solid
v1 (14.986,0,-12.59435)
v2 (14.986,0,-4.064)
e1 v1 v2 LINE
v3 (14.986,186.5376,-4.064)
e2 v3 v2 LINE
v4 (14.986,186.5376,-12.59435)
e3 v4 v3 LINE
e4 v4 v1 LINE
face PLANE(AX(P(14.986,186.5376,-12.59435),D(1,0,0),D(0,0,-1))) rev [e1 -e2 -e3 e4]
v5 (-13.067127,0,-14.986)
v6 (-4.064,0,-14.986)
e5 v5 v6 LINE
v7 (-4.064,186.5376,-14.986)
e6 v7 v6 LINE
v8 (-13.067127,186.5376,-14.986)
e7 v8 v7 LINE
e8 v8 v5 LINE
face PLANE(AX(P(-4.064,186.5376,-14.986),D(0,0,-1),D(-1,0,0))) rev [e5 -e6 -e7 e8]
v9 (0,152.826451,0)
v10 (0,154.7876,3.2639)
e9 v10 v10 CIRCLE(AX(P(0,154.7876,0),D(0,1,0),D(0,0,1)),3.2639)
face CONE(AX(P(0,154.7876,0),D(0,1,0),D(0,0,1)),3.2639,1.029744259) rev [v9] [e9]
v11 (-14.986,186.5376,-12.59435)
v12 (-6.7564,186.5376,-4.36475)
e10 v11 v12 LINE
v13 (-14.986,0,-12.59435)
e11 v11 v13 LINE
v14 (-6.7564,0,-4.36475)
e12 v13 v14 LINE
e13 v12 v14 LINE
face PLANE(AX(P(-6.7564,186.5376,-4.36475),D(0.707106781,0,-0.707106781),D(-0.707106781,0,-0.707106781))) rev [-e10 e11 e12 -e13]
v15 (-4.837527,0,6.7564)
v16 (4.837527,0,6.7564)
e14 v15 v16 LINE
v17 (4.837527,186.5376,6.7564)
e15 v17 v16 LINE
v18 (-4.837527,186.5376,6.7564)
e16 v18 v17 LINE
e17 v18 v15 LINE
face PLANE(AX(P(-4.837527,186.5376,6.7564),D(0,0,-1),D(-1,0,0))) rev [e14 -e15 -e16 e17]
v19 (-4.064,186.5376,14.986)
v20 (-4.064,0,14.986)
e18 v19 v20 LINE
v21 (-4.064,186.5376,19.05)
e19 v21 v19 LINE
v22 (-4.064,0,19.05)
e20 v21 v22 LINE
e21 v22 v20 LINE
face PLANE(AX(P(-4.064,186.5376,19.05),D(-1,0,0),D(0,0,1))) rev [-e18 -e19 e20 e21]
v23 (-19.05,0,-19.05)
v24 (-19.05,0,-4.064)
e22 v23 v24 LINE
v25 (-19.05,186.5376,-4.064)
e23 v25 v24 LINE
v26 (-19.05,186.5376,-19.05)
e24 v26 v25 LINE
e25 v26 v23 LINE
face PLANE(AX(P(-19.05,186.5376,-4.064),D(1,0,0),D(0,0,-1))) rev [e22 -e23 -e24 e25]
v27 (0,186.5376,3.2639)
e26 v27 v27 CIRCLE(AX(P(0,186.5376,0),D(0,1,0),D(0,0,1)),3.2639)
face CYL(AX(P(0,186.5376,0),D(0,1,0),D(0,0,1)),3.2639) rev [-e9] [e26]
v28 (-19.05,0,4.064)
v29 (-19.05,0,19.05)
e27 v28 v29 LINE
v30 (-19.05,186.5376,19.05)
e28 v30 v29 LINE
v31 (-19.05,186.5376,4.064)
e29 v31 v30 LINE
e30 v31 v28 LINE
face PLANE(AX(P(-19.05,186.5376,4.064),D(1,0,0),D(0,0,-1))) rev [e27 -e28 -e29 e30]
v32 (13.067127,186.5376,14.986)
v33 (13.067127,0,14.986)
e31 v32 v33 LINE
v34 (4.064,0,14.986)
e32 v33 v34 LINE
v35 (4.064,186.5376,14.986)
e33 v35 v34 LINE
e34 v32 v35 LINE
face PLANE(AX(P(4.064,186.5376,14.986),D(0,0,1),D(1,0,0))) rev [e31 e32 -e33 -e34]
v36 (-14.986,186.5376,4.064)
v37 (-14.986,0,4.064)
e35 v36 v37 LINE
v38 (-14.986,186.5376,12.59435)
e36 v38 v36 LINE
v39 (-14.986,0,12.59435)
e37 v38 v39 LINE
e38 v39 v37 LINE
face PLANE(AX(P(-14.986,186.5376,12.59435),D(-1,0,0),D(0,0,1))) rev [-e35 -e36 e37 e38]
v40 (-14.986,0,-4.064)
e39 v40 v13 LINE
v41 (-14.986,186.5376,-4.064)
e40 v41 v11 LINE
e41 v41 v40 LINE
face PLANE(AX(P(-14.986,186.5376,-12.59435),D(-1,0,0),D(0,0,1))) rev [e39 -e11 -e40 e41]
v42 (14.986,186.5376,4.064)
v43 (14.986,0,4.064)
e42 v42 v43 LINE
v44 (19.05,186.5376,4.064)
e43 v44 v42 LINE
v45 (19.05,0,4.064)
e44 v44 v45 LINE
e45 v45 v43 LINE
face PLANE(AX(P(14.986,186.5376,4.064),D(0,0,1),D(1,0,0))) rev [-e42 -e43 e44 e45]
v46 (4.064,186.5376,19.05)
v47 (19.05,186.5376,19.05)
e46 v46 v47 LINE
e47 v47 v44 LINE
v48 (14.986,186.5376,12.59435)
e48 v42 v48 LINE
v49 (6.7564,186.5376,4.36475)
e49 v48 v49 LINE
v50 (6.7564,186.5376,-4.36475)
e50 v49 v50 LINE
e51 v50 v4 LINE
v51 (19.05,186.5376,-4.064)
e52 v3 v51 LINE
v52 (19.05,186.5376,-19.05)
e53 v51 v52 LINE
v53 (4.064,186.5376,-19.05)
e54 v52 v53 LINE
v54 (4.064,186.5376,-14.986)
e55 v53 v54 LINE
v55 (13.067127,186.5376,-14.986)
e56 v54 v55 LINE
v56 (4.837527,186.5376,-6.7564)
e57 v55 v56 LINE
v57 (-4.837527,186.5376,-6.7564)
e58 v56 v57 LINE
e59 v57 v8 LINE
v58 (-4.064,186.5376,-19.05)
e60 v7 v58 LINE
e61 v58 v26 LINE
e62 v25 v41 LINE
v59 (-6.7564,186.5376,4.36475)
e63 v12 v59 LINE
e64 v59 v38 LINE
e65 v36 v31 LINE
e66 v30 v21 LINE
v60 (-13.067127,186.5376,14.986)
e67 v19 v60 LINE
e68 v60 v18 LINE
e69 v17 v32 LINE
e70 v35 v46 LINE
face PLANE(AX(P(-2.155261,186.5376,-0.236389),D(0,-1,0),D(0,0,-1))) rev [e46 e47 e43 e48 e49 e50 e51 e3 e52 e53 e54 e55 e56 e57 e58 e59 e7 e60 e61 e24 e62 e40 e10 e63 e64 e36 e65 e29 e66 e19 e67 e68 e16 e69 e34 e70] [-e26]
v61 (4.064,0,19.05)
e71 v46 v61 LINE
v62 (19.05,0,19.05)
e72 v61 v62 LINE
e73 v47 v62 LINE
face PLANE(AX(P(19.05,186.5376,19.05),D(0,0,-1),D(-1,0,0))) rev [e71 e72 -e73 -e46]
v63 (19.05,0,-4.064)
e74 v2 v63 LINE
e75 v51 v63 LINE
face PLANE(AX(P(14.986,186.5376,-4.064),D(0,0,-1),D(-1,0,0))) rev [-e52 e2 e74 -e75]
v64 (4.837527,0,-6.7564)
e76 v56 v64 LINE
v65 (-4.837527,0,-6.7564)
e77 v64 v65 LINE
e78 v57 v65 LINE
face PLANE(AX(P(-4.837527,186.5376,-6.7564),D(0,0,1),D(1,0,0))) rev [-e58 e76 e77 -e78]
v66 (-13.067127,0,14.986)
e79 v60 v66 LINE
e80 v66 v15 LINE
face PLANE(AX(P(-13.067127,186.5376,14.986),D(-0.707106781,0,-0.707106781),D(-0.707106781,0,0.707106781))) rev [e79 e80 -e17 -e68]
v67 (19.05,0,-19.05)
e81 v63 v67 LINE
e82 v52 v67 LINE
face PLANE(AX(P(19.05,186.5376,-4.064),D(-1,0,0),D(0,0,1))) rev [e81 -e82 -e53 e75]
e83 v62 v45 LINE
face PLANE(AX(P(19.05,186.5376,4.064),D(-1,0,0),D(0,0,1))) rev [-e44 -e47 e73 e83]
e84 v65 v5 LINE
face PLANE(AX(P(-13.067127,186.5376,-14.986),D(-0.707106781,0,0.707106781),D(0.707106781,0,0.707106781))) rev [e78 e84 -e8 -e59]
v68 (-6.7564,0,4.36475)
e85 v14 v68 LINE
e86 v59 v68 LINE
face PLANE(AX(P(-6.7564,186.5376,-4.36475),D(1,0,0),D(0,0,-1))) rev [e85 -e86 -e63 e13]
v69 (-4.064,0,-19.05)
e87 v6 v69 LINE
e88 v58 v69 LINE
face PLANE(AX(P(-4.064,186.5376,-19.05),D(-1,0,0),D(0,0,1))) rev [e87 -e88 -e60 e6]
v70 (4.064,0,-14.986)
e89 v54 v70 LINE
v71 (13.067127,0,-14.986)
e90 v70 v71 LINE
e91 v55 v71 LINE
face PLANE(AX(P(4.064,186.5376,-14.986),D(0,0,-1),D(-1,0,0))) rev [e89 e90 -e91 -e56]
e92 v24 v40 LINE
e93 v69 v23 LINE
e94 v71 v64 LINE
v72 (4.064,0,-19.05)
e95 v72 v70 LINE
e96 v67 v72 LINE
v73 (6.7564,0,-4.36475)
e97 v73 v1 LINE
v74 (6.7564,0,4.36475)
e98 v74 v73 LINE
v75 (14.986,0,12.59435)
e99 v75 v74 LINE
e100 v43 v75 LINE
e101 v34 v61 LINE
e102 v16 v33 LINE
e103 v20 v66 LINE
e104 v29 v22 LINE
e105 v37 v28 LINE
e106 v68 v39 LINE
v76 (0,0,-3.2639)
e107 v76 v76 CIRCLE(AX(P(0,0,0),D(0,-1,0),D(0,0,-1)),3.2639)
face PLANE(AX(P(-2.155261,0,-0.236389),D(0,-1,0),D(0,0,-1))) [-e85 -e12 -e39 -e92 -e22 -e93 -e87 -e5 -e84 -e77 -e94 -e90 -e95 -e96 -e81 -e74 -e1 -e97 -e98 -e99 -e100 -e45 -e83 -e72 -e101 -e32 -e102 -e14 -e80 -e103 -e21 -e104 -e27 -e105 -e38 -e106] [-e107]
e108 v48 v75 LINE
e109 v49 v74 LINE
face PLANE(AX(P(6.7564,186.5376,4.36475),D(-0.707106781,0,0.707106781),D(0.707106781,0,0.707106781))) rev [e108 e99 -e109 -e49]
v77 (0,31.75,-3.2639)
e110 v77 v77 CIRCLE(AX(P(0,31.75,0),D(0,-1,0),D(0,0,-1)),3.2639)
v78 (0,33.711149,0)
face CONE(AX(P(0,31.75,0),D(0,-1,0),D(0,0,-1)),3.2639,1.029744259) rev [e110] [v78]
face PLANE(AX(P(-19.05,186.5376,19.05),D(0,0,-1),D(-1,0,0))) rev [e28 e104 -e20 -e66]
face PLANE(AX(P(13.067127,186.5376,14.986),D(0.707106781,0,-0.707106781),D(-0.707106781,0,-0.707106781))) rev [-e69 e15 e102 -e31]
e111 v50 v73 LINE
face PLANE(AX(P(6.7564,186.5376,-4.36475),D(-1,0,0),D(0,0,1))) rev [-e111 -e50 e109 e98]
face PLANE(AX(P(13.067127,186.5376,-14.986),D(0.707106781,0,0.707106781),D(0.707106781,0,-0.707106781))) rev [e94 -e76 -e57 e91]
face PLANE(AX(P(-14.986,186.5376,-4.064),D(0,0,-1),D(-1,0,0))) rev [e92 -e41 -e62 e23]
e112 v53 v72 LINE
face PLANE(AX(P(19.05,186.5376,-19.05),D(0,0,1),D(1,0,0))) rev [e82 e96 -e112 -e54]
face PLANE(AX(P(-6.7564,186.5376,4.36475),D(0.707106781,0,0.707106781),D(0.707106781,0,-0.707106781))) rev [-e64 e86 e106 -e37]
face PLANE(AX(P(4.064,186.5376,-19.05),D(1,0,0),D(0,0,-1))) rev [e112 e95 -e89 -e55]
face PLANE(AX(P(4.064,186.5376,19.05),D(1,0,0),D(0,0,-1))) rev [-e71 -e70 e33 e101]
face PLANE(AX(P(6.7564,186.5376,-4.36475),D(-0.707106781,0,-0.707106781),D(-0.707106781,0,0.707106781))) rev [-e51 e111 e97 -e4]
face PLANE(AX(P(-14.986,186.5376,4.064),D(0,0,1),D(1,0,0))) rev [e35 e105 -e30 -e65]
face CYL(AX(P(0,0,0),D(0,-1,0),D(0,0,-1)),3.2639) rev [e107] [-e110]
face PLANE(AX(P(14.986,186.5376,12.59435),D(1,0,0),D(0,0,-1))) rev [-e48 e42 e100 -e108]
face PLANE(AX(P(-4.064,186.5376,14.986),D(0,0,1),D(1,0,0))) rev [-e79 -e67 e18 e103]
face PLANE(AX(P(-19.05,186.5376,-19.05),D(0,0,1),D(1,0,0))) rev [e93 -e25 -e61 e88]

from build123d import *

# Parameters (mm, degrees)
EXTRUDE1_DEPTH = 186.5376


# Read off the part's stored shape, not the designer's step: 1515<1>
with BuildPart() as part:
    # Sketch1<2> → Extrude1 (new body)
    with BuildSketch(Plane(origin=(0, 0, 0), x_dir=(1, 0, 0), z_dir=(0, 1, 0))):
        Polygon((-6.7564, 4.364749804), (-6.7564, -4.364749804), (-14.986, -12.594349804), (-14.986, -4.064), (-19.05, -4.064), (-19.05, -19.05), (-4.064, -19.05), (-4.064, -14.986), (-13.067127258, -14.986), (-4.837527258, -6.7564), (4.837527258, -6.7564), (13.067127258, -14.986), (4.064, -14.986), (4.064, -19.05), (19.05, -19.05), (19.05, -4.064), (14.986, -4.064), (14.986, -12.594349804), (6.7564, -4.364749804), (6.7564, 4.364749804), (14.986, 12.594349804), (14.986, 4.064), (19.05, 4.064), (19.05, 19.05), (4.064, 19.05), (4.064, 14.986), (13.067127258, 14.986), (4.837527258, 6.7564), (-4.837527258, 6.7564), (-13.067127258, 14.986), (-4.064, 14.986), (-4.064, 19.05), (-19.05, 19.05), (-19.05, 4.064), (-14.986, 4.064), (-14.986, 12.594349804), align=None)
    extrude(amount=EXTRUDE1_DEPTH)

    # Sketch2 → 5/16-18 Tapped Hole1 (revolve, cut)
    with BuildSketch(Plane(origin=(0, 186.5376, 0), x_dir=(0, 0, 1), z_dir=(1, 0, 0))):
        Polygon((0, 0), (0, 33.711148974), (3.2639, 31.75), (3.2639, 0), align=None)
    f_5_16_18_tapped_hole1 = revolve(axis=Axis((0, 192.8876, 0), (0, -1, 0)), mode=Mode.SUBTRACT)

    # Mirror1: 5/16-18 Tapped Hole1 across plane
    add(f_5_16_18_tapped_hole1.mirror(Plane.ZX.offset(93.2688)), mode=Mode.SUBTRACT)


solid = part.part
